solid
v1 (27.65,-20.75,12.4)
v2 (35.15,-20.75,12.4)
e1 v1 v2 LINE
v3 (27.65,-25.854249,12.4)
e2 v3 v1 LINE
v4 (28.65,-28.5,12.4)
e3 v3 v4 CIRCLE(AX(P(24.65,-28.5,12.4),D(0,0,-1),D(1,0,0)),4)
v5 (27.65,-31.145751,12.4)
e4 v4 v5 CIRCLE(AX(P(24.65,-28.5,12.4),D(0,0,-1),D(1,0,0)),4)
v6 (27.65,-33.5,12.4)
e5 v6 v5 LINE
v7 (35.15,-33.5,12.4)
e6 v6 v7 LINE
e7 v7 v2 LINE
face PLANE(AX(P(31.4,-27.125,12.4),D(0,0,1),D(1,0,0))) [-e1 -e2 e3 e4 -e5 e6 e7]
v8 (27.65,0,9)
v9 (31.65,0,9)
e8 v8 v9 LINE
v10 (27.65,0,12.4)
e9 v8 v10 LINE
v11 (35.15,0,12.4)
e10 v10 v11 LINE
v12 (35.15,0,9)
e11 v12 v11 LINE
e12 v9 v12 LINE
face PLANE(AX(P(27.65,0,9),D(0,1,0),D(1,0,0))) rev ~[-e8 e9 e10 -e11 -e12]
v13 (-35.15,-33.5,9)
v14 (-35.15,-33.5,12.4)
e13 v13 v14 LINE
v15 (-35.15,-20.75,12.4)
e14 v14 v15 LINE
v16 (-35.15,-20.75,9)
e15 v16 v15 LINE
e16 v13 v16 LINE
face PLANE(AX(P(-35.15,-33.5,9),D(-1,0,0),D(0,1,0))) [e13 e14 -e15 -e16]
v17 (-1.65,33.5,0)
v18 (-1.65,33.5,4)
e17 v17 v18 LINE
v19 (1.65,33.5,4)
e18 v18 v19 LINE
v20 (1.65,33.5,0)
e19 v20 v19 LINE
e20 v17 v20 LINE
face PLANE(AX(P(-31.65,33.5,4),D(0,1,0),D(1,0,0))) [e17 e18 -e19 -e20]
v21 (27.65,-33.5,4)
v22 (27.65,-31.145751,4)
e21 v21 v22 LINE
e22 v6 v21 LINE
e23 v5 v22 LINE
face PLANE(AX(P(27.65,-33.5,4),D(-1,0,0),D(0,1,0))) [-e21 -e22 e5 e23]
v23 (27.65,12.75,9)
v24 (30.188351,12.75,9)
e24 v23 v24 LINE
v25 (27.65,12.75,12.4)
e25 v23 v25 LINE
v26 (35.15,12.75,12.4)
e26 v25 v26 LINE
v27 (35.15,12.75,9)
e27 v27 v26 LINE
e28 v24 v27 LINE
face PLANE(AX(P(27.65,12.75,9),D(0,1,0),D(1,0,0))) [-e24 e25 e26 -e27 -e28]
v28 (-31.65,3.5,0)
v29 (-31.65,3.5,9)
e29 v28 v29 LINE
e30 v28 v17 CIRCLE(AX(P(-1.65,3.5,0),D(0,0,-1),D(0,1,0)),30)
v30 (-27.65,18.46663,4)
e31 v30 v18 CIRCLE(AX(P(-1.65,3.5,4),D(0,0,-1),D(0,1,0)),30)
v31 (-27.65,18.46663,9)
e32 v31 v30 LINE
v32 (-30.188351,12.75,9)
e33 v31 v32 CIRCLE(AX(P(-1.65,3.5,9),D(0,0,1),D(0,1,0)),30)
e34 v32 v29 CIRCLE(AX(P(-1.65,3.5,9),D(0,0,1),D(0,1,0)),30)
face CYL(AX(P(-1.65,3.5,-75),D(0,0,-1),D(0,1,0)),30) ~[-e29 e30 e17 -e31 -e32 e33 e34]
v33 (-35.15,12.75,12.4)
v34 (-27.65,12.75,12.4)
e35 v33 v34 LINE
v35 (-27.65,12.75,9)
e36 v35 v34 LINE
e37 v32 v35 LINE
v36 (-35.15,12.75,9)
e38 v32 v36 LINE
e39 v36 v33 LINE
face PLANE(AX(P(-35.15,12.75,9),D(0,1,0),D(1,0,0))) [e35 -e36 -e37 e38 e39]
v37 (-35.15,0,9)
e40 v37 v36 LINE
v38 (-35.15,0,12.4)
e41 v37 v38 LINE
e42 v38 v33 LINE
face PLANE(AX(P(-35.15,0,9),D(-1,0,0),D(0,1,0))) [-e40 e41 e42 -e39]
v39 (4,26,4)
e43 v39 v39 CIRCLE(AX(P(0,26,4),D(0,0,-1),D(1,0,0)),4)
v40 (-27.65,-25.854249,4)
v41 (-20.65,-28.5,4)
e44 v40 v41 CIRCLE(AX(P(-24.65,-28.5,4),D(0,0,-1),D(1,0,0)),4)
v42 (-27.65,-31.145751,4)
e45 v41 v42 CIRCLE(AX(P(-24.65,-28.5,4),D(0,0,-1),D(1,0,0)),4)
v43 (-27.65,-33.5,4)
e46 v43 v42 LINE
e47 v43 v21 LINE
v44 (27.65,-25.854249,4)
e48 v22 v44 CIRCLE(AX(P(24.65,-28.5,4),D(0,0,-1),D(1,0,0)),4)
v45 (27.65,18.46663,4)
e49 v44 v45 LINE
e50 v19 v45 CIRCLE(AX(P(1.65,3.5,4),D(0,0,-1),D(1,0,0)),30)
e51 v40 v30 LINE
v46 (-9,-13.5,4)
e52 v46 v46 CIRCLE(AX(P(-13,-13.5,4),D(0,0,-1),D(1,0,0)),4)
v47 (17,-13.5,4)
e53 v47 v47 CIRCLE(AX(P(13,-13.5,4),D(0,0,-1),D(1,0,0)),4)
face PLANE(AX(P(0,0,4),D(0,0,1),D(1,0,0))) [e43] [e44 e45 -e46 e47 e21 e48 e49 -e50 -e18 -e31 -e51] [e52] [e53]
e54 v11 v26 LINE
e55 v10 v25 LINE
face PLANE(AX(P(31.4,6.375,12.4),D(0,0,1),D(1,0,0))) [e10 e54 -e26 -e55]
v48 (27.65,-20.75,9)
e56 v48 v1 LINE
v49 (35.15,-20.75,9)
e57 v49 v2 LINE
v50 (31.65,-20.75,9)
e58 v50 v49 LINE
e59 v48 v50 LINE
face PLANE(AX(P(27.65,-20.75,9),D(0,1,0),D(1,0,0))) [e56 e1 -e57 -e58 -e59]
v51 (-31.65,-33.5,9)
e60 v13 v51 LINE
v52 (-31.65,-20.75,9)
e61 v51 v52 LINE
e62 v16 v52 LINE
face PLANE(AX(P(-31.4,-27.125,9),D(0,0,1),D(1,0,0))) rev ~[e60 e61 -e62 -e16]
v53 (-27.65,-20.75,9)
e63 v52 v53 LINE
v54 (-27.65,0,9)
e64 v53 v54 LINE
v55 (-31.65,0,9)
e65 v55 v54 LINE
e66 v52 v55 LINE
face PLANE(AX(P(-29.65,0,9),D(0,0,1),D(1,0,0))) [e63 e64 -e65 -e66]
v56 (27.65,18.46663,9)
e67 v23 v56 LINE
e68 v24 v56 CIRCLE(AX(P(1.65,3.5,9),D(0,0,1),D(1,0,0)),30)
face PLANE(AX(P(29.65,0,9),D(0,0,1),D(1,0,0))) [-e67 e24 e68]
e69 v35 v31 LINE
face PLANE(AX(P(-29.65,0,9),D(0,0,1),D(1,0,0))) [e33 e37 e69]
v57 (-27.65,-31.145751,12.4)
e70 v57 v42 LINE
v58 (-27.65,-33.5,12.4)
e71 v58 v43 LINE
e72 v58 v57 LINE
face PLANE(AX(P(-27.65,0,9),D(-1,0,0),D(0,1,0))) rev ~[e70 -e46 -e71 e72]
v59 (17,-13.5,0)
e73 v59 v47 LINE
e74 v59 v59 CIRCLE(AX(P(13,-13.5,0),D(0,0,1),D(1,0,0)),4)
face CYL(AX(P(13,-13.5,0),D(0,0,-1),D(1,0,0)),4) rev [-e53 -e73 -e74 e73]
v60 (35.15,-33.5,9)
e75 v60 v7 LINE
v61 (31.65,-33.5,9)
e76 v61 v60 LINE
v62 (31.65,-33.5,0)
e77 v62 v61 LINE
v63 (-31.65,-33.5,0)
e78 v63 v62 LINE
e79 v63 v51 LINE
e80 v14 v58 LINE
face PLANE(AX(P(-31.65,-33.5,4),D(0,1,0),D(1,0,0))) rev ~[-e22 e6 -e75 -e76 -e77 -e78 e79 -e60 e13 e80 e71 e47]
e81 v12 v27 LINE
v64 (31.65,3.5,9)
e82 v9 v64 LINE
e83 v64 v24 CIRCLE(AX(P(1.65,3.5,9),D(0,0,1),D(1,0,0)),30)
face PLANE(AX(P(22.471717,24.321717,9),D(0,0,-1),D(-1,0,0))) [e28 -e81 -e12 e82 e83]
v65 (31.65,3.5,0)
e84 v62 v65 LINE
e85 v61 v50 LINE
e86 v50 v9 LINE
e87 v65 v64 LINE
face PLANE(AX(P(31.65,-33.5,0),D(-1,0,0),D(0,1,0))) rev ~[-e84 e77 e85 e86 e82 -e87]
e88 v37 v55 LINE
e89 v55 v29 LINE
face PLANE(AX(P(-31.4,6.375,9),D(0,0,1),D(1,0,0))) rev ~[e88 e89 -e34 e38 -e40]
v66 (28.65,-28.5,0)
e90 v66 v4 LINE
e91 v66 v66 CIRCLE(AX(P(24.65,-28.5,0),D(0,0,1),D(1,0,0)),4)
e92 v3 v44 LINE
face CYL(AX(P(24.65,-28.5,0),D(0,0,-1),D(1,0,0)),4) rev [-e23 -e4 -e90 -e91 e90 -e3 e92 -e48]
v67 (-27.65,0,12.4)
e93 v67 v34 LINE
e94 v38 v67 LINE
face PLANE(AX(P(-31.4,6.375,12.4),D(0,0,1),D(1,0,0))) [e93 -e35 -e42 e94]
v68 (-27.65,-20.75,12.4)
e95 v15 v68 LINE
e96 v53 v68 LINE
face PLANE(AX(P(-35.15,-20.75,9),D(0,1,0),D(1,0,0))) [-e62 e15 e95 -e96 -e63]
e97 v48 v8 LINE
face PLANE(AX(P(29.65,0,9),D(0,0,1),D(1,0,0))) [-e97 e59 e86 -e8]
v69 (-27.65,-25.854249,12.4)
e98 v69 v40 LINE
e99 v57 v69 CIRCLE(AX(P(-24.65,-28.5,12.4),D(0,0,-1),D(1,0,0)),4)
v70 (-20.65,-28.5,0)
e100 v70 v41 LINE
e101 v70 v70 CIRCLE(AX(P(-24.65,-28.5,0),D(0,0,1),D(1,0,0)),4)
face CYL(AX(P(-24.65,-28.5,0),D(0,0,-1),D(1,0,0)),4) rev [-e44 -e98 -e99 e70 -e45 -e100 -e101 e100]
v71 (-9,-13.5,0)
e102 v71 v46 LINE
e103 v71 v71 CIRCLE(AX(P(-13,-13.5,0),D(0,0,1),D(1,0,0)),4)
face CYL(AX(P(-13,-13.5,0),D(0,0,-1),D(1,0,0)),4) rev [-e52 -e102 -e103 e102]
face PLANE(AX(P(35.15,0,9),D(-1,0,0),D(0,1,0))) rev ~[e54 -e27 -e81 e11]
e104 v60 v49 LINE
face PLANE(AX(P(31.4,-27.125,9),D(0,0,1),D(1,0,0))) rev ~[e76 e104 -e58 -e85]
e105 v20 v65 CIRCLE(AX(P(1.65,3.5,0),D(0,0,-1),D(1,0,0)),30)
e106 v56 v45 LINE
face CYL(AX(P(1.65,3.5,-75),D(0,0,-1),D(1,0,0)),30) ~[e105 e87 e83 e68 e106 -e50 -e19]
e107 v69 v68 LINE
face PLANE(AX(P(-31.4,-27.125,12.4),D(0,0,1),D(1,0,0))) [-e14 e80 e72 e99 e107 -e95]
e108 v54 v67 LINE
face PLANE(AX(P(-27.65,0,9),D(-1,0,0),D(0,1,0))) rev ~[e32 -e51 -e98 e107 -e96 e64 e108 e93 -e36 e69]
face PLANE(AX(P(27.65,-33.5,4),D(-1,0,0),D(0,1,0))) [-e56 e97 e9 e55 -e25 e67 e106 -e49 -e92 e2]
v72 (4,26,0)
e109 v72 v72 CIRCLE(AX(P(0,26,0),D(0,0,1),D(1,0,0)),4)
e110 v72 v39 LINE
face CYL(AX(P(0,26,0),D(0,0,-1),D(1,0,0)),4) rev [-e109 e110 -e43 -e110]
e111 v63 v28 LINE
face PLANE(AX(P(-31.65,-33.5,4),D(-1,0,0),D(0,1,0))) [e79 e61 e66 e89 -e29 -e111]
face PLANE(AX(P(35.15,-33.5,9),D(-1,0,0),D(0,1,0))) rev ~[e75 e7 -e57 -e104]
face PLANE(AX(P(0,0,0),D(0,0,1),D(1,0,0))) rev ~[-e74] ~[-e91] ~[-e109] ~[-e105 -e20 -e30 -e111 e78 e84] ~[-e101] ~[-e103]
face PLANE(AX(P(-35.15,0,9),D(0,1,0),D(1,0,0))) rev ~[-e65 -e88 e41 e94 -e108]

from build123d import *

# Parameters (mm, degrees)
F0_W         = 63.3
F0_H         = 67
F1_DEPTH     = 4
F3_W         = 4
F3_H         = 67
F4_DEPTH     = 5
F6_W         = 7.5
F6_H         = 12.75
F7_DEPTH     = 3.4
F2_R         = 4
F9_DEPTH     = 25
F8_R         = 4
F10_DEPTH    = 25
F11_T1_DEPTH = 84
F12_T1_DEPTH = 84


# Not quite as in the source:
# - a fillet or chamfer that OpenCascade refuses, or shapes differently, is made with other operations: its cross-section is extruded or revolved along the edge and cut away or added


with BuildPart() as f1:
    # F0 (on Top) → F1 (new body)
    with BuildSketch(Plane.XY):
        Rectangle(F0_W, F0_H)
    extrude(amount=F1_DEPTH)

    # F3 (on face) → F4 (join)
    with BuildSketch(Plane.XY.offset(4)):
        with Locations((-29.65, 0)):
            Rectangle(F3_W, F3_H)
        with Locations((29.65, 0)):
            Rectangle(F3_W, F3_H)
    extrude(amount=F4_DEPTH)

    # F6 (on face) → F7 (join)
    with BuildSketch(Plane.XY.offset(9)):
        with Locations((-31.4, 6.375)):
            Rectangle(F6_W, F6_H)
        with Locations((-31.4, -27.125)):
            Rectangle(F6_W, F6_H)
        with Locations((31.4, -27.125)):
            Rectangle(F6_W, F6_H)
        with Locations((31.4, 6.375)):
            Rectangle(F6_W, F6_H)
    extrude(amount=F7_DEPTH)

    # F2 (on Top) → F9 (cut)
    with BuildSketch(Plane.XY):
        with Locations((-24.65, -28.5)):
            Circle(F2_R)
        with Locations((24.65, -28.5)):
            Circle(F2_R)
    extrude(amount=F9_DEPTH, mode=Mode.SUBTRACT)

    # F8 (on Top) → F10 (cut)
    with BuildSketch(Plane.XY):
        with Locations((0, 26)):
            Circle(F8_R)
        with Locations((-13, -13.5)):
            Circle(F8_R)
        with Locations((13, -13.5)):
            Circle(F8_R)
    extrude(amount=F10_DEPTH, mode=Mode.SUBTRACT)

    # F11: fillet of radius 30 on 1 edges, made by hand

    # F11_s2 → F11_t1 (cut)
    with BuildSketch(Plane.XY.offset(-75)):
        with BuildLine():
            ThreePointArc((-1.65, 33.5), (-22.8632034356, 24.7132034356), (-31.65, 3.5))
            Line((-31.65, 3.5), (-31.65, 33.5))
            Line((-31.65, 33.5), (-1.65, 33.5))
        make_face()
    extrude(amount=F11_T1_DEPTH, mode=Mode.SUBTRACT)

    # F12: fillet of radius 30 on 1 edges, made by hand

    # F12_s2 → F12_t1 (cut)
    with BuildSketch(Plane.XY.offset(-75)):
        with BuildLine():
            ThreePointArc((31.65, 3.5), (22.8632034356, 24.7132034356), (1.65, 33.5))
            Line((1.65, 33.5), (31.65, 33.5))
            Line((31.65, 33.5), (31.65, 3.5))
        make_face()
    extrude(amount=F12_T1_DEPTH, mode=Mode.SUBTRACT)


solid = f1.part
